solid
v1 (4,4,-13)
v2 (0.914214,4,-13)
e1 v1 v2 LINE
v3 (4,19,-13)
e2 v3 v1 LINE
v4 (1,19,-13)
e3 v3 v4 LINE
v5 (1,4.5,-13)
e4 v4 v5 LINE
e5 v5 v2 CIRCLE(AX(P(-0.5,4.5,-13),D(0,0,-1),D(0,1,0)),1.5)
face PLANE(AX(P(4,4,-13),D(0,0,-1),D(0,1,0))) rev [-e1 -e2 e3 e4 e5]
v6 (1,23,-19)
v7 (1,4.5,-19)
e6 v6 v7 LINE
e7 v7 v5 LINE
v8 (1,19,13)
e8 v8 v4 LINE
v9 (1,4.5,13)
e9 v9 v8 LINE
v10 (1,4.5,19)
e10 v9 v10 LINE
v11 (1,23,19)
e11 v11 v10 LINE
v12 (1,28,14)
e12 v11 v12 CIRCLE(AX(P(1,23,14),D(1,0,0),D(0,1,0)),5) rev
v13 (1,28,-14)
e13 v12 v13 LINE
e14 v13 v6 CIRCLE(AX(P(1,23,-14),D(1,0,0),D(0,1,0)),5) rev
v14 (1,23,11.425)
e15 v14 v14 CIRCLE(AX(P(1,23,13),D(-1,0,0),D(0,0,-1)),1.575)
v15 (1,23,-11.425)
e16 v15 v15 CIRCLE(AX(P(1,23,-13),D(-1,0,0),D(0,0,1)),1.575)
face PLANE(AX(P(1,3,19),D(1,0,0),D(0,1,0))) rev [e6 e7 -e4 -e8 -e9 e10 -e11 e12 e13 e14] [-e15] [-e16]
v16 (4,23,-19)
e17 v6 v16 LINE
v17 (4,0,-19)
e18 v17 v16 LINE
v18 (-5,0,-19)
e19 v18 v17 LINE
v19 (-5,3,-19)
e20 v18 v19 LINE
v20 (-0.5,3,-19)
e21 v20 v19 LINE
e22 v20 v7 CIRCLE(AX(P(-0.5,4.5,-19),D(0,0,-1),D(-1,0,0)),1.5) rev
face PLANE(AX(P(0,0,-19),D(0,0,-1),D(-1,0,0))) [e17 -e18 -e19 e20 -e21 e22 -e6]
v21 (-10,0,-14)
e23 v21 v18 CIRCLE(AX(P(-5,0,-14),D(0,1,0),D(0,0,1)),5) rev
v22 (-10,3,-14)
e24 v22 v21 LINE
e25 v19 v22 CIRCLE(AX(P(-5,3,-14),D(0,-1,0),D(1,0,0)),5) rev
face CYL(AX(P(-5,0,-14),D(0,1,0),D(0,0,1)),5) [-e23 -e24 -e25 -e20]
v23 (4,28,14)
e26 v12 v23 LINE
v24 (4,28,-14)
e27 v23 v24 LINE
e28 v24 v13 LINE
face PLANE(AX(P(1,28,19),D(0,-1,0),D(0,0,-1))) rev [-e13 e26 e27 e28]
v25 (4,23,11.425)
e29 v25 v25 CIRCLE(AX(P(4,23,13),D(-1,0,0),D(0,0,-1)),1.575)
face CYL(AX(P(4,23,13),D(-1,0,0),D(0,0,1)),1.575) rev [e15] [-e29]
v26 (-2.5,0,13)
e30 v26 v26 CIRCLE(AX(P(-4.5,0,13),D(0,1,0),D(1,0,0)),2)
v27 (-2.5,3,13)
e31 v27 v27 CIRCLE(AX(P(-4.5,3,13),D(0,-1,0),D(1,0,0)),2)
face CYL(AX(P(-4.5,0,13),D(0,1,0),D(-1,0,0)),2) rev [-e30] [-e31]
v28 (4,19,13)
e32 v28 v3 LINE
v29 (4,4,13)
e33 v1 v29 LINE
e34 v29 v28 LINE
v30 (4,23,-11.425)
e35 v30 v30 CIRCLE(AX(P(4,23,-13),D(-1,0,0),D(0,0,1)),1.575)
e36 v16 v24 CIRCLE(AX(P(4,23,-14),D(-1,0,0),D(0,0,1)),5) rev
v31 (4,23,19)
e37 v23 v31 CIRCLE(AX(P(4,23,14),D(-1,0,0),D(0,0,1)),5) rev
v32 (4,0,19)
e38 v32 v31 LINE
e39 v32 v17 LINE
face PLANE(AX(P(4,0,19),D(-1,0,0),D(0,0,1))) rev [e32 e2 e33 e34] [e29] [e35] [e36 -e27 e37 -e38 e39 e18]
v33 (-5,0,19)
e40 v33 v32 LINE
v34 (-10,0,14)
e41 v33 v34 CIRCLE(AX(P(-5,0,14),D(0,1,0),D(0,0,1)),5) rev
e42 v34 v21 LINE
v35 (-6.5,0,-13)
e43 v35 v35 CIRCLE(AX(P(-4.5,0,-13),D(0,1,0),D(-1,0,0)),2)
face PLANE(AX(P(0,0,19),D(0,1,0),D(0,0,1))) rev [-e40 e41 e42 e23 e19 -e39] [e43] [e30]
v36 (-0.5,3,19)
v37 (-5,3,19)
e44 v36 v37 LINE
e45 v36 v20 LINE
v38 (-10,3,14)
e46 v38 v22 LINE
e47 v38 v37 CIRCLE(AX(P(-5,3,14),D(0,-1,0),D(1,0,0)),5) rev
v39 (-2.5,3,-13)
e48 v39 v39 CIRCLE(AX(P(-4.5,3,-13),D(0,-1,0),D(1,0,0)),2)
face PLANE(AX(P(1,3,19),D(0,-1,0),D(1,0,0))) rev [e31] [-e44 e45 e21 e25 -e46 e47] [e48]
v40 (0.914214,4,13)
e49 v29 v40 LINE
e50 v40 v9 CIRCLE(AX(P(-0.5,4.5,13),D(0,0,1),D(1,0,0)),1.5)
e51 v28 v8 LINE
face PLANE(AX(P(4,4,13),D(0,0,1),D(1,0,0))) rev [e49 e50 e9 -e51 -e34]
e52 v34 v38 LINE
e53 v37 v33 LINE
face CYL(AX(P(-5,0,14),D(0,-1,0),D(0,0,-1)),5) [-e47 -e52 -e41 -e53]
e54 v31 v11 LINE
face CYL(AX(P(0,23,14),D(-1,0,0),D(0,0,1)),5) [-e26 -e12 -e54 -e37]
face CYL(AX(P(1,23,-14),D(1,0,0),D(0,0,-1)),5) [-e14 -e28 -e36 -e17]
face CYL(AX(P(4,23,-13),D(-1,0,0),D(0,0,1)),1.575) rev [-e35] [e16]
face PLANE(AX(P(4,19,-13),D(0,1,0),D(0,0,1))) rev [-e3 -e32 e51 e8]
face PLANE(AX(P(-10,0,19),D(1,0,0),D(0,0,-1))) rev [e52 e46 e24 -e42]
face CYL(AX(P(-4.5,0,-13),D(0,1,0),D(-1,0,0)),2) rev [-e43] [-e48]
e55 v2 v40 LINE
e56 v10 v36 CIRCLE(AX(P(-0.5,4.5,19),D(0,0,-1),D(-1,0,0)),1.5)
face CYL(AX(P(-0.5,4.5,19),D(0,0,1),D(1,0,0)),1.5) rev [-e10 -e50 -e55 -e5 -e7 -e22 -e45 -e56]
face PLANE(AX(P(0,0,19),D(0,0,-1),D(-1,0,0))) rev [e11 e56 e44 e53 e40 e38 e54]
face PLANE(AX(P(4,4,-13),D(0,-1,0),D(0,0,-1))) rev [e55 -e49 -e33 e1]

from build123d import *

# Parameters (mm, degrees)
BOSS_EXTRUDE1_DEPTH     = 19
CUT_EXTRUDE1_DEPTH      = 33.954514107
CUT_EXTRUDE1_DEPTH_BACK = 33.954514107
SKETCH2_R               = 2
SKETCH3_R               = 1.575
SKETCH3_W               = 26
SKETCH3_H               = 15
CUT_EXTRUDE2_DEPTH      = 36.580893749
FILLET1_R               = 1.5
FILLET2_R               = 5


with BuildPart() as part:
    # Sketch1 → Boss-Extrude1 (new, symmetric)
    with BuildSketch(Plane.XY):
        Polygon((0, 0), (4, 0), (4, 28), (1, 28), (1, 3), (-10, 3), (-10, 0), align=None)
    extrude(amount=BOSS_EXTRUDE1_DEPTH, both=True)

    # Sketch2 → Cut-Extrude1 (cut, two sides: drawn at the far end of the back side and taken through both)
    with BuildSketch(Plane(origin=(0, 3, 0), x_dir=(1, 0, 0), z_dir=(0, 1, 0)).offset(-CUT_EXTRUDE1_DEPTH_BACK)):
        with Locations(Location((-4.5, 13, 0), (0, 0, 180))):
            Circle(SKETCH2_R)
        with Locations((-4.5, -13)):
            Circle(SKETCH2_R)
    extrude(amount=CUT_EXTRUDE1_DEPTH + CUT_EXTRUDE1_DEPTH_BACK, mode=Mode.SUBTRACT)

    # Sketch3 → Cut-Extrude2 (cut, through all)
    with BuildSketch(Plane.ZY.offset(-1)):
        with Locations((-13, 23)):
            Circle(SKETCH3_R)
        with Locations(Location((13, 23, 0), (0, 0, 180))):
            Circle(SKETCH3_R)
        with Locations((0, 11.5)):
            Rectangle(SKETCH3_W, SKETCH3_H)
    extrude(amount=-CUT_EXTRUDE2_DEPTH, mode=Mode.SUBTRACT)

    # Fillet1
    # the kernel refuses this fillet: 1.5 mm, written as the material it adds along each edge
    with BuildSketch(Plane(origin=(1, 3, -19), x_dir=(0, 1, 0), z_dir=(0, 0, 1))) as fillet1_piece_1_section:
        with BuildLine():
            CenterArc((FILLET1_R, FILLET1_R), FILLET1_R, 180, 90)
            Line((0, FILLET1_R), (0, 0))
            Line((0, 0), (FILLET1_R, 0))
        make_face()
    fillet1_piece_1 = extrude(amount=38, mode=Mode.PRIVATE)
    fillet1_piece_1 = split(fillet1_piece_1, bisect_by=Plane(origin=(0.995303959, 4, -16), z_dir=(0, 1, 0)), keep=Keep.TOP, mode=Mode.PRIVATE)
    fillet1_piece_1 = split(fillet1_piece_1, bisect_by=Plane(origin=(0.995303959, 4.189014255, -13), z_dir=(0, 0, -1)), keep=Keep.TOP, mode=Mode.PRIVATE)
    add(fillet1_piece_1)
    with BuildSketch(Plane(origin=(1, 3, -19), x_dir=(0, 1, 0), z_dir=(0, 0, 1))) as fillet1_piece_2_section:
        with BuildLine():
            CenterArc((FILLET1_R, FILLET1_R), FILLET1_R, 180, 90)
            Line((0, FILLET1_R), (0, 0))
            Line((0, 0), (FILLET1_R, 0))
        make_face()
    fillet1_piece_2 = extrude(amount=38, mode=Mode.PRIVATE)
    fillet1_piece_2 = split(fillet1_piece_2, bisect_by=Plane(origin=(0.642494848, 4, -16), z_dir=(0, -1, 0)), keep=Keep.TOP, mode=Mode.PRIVATE)
    fillet1_piece_2 = split(fillet1_piece_2, bisect_by=Plane(origin=(0.642494848, 3.294160002, -13), z_dir=(0, 0, -1)), keep=Keep.TOP, mode=Mode.PRIVATE)
    add(fillet1_piece_2)
    with BuildSketch(Plane(origin=(1, 3, -19), x_dir=(0, 1, 0), z_dir=(0, 0, 1))) as fillet1_piece_3_section:
        with BuildLine():
            CenterArc((FILLET1_R, FILLET1_R), FILLET1_R, 180, 90)
            Line((0, FILLET1_R), (0, 0))
            Line((0, 0), (FILLET1_R, 0))
        make_face()
    fillet1_piece_3 = extrude(amount=38, mode=Mode.PRIVATE)
    fillet1_piece_3 = split(fillet1_piece_3, bisect_by=Plane(origin=(0.642494848, 4, 0), z_dir=(0, -1, 0)), keep=Keep.TOP, mode=Mode.PRIVATE)
    fillet1_piece_3 = split(fillet1_piece_3, bisect_by=Plane(origin=(0.642494848, 3.294160002, -13), z_dir=(0, 0, 1)), keep=Keep.TOP, mode=Mode.PRIVATE)
    fillet1_piece_3 = split(fillet1_piece_3, bisect_by=Plane(origin=(0.642494848, 3.294160002, 13), z_dir=(0, 0, -1)), keep=Keep.TOP, mode=Mode.PRIVATE)
    add(fillet1_piece_3)
    with BuildSketch(Plane(origin=(1, 3, -19), x_dir=(0, 1, 0), z_dir=(0, 0, 1))) as fillet1_piece_4_section:
        with BuildLine():
            CenterArc((FILLET1_R, FILLET1_R), FILLET1_R, 180, 90)
            Line((0, FILLET1_R), (0, 0))
            Line((0, 0), (FILLET1_R, 0))
        make_face()
    fillet1_piece_4 = extrude(amount=38, mode=Mode.PRIVATE)
    fillet1_piece_4 = split(fillet1_piece_4, bisect_by=Plane(origin=(0.995303959, 4, 16), z_dir=(0, 1, 0)), keep=Keep.TOP, mode=Mode.PRIVATE)
    fillet1_piece_4 = split(fillet1_piece_4, bisect_by=Plane(origin=(0.995303959, 4.189014255, 13), z_dir=(0, 0, 1)), keep=Keep.TOP, mode=Mode.PRIVATE)
    add(fillet1_piece_4)
    with BuildSketch(Plane(origin=(1, 3, -19), x_dir=(0, 1, 0), z_dir=(0, 0, 1))) as fillet1_piece_5_section:
        with BuildLine():
            CenterArc((FILLET1_R, FILLET1_R), FILLET1_R, 180, 90)
            Line((0, FILLET1_R), (0, 0))
            Line((0, 0), (FILLET1_R, 0))
        make_face()
    fillet1_piece_5 = extrude(amount=38, mode=Mode.PRIVATE)
    fillet1_piece_5 = split(fillet1_piece_5, bisect_by=Plane(origin=(0.642494848, 4, 16), z_dir=(0, -1, 0)), keep=Keep.TOP, mode=Mode.PRIVATE)
    fillet1_piece_5 = split(fillet1_piece_5, bisect_by=Plane(origin=(0.642494848, 3.294160002, 13), z_dir=(0, 0, 1)), keep=Keep.TOP, mode=Mode.PRIVATE)
    add(fillet1_piece_5)

    # Fillet2
    fillet2_edges = [part.edges().sort_by_distance(p)[0] for p in [
        (2.5, 28, 19),
        (-10, 1.5, 19),
        (-10, 1.5, -19),
        (2.5, 28, -19),
    ]]
    fillet(fillet2_edges, radius=FILLET2_R)


solid = part.part
